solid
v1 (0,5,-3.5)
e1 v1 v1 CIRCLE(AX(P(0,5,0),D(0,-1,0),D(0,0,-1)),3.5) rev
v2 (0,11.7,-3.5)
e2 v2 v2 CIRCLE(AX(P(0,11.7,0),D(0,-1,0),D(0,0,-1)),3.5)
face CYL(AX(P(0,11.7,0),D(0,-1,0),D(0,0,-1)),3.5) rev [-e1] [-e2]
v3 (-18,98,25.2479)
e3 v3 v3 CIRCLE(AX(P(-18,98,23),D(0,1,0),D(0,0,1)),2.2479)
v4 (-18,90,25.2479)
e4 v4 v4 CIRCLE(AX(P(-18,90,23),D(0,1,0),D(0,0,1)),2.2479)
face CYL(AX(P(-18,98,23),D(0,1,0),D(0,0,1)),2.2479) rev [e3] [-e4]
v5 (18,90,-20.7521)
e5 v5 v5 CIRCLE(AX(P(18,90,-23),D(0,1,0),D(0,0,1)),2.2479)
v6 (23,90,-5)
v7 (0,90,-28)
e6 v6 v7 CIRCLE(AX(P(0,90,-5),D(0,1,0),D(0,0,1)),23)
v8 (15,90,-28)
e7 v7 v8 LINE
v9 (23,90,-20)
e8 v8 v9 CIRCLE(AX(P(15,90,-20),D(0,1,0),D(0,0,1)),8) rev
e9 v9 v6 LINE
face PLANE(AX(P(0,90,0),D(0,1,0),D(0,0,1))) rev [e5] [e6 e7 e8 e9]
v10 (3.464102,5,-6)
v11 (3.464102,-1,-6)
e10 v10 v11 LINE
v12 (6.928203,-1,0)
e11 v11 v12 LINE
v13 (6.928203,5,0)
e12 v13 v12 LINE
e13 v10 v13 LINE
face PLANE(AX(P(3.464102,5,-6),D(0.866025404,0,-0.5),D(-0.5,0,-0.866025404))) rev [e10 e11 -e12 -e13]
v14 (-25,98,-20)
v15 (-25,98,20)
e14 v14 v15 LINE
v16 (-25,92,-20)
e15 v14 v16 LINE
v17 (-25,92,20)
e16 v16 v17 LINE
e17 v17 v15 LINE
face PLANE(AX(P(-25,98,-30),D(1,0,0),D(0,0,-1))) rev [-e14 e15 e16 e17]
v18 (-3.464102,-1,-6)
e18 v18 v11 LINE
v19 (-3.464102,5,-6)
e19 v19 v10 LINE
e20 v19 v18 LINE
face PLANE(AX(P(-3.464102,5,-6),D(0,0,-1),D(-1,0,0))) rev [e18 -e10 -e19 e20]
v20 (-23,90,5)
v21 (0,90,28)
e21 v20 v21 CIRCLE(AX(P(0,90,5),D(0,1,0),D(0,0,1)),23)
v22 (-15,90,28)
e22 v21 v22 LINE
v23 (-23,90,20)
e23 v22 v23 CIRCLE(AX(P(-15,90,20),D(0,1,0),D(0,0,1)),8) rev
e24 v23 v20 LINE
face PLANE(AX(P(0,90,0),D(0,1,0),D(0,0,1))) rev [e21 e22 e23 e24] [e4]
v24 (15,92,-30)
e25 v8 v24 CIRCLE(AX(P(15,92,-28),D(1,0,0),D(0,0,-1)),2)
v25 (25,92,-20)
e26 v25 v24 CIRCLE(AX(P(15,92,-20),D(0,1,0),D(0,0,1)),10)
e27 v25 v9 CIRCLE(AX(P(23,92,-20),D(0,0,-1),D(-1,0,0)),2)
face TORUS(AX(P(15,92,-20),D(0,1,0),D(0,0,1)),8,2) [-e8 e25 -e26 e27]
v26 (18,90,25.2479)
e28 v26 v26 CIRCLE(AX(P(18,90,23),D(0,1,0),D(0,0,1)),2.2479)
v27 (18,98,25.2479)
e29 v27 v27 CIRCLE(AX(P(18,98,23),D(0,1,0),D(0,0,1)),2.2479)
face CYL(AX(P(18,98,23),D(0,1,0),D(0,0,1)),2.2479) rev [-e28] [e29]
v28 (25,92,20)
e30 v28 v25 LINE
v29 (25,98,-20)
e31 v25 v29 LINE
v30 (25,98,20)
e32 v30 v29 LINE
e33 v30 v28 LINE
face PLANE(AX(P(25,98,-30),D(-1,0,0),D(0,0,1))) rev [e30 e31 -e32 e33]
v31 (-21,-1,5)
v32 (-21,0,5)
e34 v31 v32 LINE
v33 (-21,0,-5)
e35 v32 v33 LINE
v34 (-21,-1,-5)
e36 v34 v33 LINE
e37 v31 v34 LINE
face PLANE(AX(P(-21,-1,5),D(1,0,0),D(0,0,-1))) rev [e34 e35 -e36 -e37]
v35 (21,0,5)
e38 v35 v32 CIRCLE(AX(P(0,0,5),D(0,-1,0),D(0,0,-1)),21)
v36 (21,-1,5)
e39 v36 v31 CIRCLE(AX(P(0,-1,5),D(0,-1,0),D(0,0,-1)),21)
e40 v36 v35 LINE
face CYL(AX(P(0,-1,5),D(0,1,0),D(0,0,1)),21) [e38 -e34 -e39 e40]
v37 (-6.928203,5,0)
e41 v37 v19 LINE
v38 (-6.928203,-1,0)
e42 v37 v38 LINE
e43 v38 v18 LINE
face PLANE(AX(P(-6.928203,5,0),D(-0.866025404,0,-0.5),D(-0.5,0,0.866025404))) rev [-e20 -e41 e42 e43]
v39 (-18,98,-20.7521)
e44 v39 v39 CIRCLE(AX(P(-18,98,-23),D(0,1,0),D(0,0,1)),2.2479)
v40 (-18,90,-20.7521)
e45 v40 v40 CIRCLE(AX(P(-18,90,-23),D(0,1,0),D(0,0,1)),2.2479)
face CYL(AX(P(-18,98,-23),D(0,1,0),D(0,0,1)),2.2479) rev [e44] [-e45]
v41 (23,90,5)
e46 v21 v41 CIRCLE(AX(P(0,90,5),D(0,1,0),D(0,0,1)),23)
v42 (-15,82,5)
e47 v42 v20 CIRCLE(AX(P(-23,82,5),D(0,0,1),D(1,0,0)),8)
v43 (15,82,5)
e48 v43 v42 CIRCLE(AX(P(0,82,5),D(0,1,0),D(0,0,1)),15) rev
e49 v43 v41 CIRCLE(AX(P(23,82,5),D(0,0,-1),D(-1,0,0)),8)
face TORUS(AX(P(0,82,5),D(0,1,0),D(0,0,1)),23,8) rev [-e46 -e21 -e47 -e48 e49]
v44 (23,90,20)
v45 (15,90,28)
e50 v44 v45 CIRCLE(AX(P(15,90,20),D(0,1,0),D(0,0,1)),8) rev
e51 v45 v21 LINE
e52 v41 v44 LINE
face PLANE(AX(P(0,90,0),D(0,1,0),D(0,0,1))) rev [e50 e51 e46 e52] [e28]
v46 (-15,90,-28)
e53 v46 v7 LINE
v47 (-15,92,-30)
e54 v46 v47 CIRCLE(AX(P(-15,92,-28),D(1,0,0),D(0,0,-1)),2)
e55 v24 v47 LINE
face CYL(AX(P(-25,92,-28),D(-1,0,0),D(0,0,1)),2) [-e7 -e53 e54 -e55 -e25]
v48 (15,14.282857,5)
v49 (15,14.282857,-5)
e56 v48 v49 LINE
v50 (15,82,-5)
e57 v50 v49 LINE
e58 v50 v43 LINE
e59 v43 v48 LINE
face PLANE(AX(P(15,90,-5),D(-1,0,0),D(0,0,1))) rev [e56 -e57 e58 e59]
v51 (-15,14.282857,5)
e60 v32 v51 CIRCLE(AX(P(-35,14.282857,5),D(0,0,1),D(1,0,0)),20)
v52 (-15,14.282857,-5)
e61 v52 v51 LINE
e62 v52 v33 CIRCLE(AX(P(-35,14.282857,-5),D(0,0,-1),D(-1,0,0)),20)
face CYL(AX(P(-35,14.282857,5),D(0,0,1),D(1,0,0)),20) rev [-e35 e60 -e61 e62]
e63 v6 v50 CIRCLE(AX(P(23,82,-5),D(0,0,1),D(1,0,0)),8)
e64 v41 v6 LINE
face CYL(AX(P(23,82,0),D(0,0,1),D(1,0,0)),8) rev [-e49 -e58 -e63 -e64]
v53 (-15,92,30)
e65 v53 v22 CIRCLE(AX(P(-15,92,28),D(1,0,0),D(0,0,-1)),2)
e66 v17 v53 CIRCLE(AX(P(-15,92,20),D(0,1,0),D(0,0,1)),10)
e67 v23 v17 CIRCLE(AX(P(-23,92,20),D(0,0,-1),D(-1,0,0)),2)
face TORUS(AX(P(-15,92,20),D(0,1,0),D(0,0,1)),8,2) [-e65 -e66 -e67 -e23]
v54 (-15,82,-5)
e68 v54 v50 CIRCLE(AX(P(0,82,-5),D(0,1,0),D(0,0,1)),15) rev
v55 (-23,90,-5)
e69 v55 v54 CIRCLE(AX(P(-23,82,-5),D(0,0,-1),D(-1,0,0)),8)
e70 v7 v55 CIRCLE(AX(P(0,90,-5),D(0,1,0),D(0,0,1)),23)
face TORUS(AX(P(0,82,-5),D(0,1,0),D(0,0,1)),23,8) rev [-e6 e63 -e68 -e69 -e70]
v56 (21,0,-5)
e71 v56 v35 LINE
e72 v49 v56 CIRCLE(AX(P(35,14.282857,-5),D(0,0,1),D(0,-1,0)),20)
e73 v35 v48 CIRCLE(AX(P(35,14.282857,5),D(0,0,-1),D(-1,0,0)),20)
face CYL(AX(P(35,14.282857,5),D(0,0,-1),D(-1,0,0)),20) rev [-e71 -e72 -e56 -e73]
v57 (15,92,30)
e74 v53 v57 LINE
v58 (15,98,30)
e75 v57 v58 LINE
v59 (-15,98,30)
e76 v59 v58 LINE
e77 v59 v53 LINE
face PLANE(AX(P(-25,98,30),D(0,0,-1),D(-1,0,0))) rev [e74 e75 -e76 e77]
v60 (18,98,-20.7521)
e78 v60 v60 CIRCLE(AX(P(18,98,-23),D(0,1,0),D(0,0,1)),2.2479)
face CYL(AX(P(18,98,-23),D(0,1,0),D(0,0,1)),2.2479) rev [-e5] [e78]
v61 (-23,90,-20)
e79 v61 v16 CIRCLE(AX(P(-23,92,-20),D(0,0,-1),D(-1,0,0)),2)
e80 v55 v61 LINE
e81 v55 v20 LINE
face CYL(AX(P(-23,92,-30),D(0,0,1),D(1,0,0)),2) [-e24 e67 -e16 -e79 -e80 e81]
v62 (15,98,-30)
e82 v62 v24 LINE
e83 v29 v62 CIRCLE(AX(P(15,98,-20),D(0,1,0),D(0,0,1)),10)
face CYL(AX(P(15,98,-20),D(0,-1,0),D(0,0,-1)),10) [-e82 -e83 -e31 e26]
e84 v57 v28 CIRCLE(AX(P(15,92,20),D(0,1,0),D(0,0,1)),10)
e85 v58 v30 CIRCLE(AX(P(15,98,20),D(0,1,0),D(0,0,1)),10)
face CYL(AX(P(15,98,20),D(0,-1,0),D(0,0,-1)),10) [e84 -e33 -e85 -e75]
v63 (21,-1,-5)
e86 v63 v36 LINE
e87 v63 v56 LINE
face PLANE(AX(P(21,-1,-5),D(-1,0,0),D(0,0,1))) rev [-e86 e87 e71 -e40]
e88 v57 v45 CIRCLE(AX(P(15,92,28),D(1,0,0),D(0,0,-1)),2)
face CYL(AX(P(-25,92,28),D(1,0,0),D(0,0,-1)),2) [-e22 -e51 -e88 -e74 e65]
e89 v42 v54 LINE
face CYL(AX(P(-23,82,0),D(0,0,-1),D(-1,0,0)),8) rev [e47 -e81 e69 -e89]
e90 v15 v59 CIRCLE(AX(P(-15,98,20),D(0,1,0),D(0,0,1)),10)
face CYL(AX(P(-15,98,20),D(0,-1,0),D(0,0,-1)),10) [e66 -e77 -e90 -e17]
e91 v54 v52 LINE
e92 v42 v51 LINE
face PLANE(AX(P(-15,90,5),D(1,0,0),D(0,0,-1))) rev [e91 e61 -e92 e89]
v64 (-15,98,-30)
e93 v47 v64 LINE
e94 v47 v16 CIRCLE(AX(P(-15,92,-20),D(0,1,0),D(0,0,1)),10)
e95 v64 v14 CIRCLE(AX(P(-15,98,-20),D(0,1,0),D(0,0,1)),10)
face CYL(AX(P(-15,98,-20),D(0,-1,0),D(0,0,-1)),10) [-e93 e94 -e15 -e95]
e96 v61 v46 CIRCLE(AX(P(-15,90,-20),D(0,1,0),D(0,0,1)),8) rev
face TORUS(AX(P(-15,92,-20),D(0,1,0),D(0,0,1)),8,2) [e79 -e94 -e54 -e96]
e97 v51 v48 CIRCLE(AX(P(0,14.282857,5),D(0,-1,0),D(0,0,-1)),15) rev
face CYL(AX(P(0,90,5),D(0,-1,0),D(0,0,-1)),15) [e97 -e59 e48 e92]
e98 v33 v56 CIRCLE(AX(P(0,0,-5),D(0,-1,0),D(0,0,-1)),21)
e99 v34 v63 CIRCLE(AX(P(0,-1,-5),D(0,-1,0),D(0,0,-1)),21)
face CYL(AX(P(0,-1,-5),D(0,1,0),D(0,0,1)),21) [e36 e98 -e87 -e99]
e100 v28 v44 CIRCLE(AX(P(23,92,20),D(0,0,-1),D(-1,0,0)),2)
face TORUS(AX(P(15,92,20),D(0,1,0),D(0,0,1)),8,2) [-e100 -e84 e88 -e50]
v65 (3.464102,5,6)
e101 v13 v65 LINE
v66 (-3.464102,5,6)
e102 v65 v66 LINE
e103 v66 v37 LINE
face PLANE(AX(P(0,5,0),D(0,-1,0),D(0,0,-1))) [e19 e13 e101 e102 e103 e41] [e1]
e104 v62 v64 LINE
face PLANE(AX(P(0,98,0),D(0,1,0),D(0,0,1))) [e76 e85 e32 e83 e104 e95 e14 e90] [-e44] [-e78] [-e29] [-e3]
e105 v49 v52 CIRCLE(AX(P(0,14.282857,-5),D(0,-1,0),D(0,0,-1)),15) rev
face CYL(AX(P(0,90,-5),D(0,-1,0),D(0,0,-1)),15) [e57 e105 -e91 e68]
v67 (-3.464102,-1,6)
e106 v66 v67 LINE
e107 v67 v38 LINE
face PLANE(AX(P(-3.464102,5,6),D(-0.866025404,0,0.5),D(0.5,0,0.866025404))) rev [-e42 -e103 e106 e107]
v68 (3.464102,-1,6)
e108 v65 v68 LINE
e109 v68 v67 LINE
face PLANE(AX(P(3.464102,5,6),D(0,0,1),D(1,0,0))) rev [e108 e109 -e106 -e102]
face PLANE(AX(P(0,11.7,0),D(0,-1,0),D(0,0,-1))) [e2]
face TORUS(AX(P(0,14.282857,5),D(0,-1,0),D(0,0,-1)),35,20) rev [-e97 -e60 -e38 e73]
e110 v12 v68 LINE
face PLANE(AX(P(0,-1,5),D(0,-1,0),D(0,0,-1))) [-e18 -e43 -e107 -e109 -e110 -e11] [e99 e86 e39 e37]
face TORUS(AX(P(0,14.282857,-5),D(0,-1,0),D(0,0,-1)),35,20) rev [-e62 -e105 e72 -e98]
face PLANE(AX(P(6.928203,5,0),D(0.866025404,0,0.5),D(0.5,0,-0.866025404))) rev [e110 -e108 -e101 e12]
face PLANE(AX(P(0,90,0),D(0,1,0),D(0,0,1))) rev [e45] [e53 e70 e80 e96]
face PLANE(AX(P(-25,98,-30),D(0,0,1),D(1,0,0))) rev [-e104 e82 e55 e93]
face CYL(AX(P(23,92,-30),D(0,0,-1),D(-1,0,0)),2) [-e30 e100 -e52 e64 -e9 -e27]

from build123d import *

# Parameters (mm, degrees)
BOSS_EXTRUDE1_DEPTH       = 90
BOSS_EXTRUDE2_DEPTH       = 1
SKETCH3_W                 = 50
SKETCH3_H                 = 60
BOSS_EXTRUDE3_DEPTH       = 8
FILLET1_R                 = 20
FILLET1_R_2               = 8
F_8_CLEARANCE_HOLE1_D     = 4.4958
F_8_CLEARANCE_HOLE1_DEPTH = 15
F_8_CLEARANCE_HOLE1_TIP   = 1.350674586
SKETCH8_R                 = 3.5
CUT_EXTRUDE2_DEPTH        = 12.7
CUT_EXTRUDE1_DEPTH        = 6
FILLET2_R                 = 10
FILLET3_R                 = 2


# Some blends are built 0.0001 mm under size
with BuildPart() as part:
    # Sketch1 → Boss-Extrude1 (new body)
    with BuildSketch(Plane(origin=(0, 0, 0), x_dir=(1, 0, 0), z_dir=(0, 1, 0))):
        with BuildLine():
            Line((-15, -5), (-15, 5))
            ThreePointArc((-15, 5), (0, 20), (15, 5))
            Line((15, 5), (15, -5))
            ThreePointArc((15, -5), (0, -20), (-15, -5))
        make_face()
    extrude(amount=BOSS_EXTRUDE1_DEPTH)

    # Sketch2 → Boss-Extrude2 (add)
    with BuildSketch(Plane.XZ):
        with BuildLine():
            Line((-21, 5), (-21, -5))
            ThreePointArc((-21, -5), (0, -26), (21, -5))
            Line((21, -5), (21, 5))
            ThreePointArc((21, 5), (0, 26), (-21, 5))
        make_face()
    extrude(amount=BOSS_EXTRUDE2_DEPTH)

    # Sketch3 → Boss-Extrude3 (add)
    with BuildSketch(Plane(origin=(0, 90, 0), x_dir=(1, 0, 0), z_dir=(0, 1, 0))):
        Rectangle(SKETCH3_W, SKETCH3_H)
    extrude(amount=BOSS_EXTRUDE3_DEPTH)

    # Fillet1
    # the kernel refuses this fillet: 20, 8 mm, written as the material it adds along each edge
    with BuildSketch(Plane(origin=(0, 0, 5), x_dir=(1, 0, 0), z_dir=(0, 0, -1))) as fillet1_piece_1:
        with BuildLine():
            CenterArc((35, -14.282856857), FILLET1_R, 134.427004001, 45.572995999)
            Line((21, 0), (20.72, 0.285657137))
            ThreePointArc((20.72, 0.285657137), (18, 0.4), (15, 0.4))
            Line((15, 0.4), (14.6, 0))
            Line((14.6, 0), (14.6, -14.282856857))
            Line((14.6, -14.282856857), (15, -14.282856857))
        make_face()
    revolve(axis=Axis((0, 0, 5), (0, -1, 0)), revolution_arc=180)
    with BuildSketch(Plane(origin=(0, 90, 5), x_dir=(1, 0, 0), z_dir=(0, 0, -1))) as fillet1_piece_2:
        with BuildLine():
            CenterArc((15 + FILLET1_R_2, FILLET1_R_2), FILLET1_R_2, 180, 90)
            Line((15, FILLET1_R_2), (15 - FILLET1_R_2 * 0.02, FILLET1_R_2))
            Line((15 - FILLET1_R_2 * 0.02, FILLET1_R_2), (15 - FILLET1_R_2 * 0.02, -FILLET1_R_2 * 0.02))
            Line((15 - FILLET1_R_2 * 0.02, -FILLET1_R_2 * 0.02), (15 + FILLET1_R_2, -FILLET1_R_2 * 0.02))
            Line((15 + FILLET1_R_2, -FILLET1_R_2 * 0.02), (15 + FILLET1_R_2, 0))
        make_face()
    revolve(axis=Axis((0, 90, 5), (0, -1, 0)), revolution_arc=180)
    with BuildSketch(Plane(origin=(15, 90, -5), x_dir=(1, 0, 0), z_dir=(0, 0, 1)), Plane(origin=(-15, 90, 5), x_dir=(-1, 0, 0), z_dir=(0, 0, -1))) as fillet1_piece_3:
        with BuildLine():
            CenterArc((FILLET1_R_2, -FILLET1_R_2), FILLET1_R_2, 90, 90)
            Line((0, -FILLET1_R_2), (-FILLET1_R_2 * 0.02, -FILLET1_R_2))
            Line((-FILLET1_R_2 * 0.02, -FILLET1_R_2), (-FILLET1_R_2 * 0.02, FILLET1_R_2 * 0.02))
            Line((-FILLET1_R_2 * 0.02, FILLET1_R_2 * 0.02), (FILLET1_R_2, FILLET1_R_2 * 0.02))
            Line((FILLET1_R_2, FILLET1_R_2 * 0.02), (FILLET1_R_2, 0))
        make_face()
    extrude(amount=10)
    with BuildSketch(Plane(origin=(0, 90, -5), x_dir=(-1, 0, 0), z_dir=(0, 0, 1))) as fillet1_piece_4:
        with BuildLine():
            CenterArc((15 + FILLET1_R_2, FILLET1_R_2), FILLET1_R_2, 180, 90)
            Line((15, FILLET1_R_2), (15 - FILLET1_R_2 * 0.02, FILLET1_R_2))
            Line((15 - FILLET1_R_2 * 0.02, FILLET1_R_2), (15 - FILLET1_R_2 * 0.02, -FILLET1_R_2 * 0.02))
            Line((15 - FILLET1_R_2 * 0.02, -FILLET1_R_2 * 0.02), (15 + FILLET1_R_2, -FILLET1_R_2 * 0.02))
            Line((15 + FILLET1_R_2, -FILLET1_R_2 * 0.02), (15 + FILLET1_R_2, 0))
        make_face()
    revolve(axis=Axis((0, 90, -5), (0, -1, 0)), revolution_arc=180)
    with BuildSketch(Plane(origin=(15, 0, -5), x_dir=(0, 1, 0), z_dir=(0, 0, 1)), Plane(origin=(-15, 0, 5), x_dir=(0, 1, 0), z_dir=(0, 0, -1))) as fillet1_piece_5:
        with BuildLine():
            CenterArc((14.282856857, -20), FILLET1_R, 90, 45.572995999)
            Line((0, -6), (-0.285657137, -5.72))
            ThreePointArc((-0.285657137, -5.72), (-0.4, -3), (-0.4, 0))
            Line((-0.4, 0), (0, 0.4))
            Line((0, 0.4), (14.282856857, 0.4))
            Line((14.282856857, 0.4), (14.282856857, 0))
        make_face()
    extrude(amount=10)
    with BuildSketch(Plane(origin=(0, 0, -5), x_dir=(-1, 0, 0), z_dir=(0, 0, 1))) as fillet1_piece_6:
        with BuildLine():
            CenterArc((35, -14.282856857), FILLET1_R, 134.427004001, 45.572995999)
            Line((21, 0), (20.72, 0.285657137))
            ThreePointArc((20.72, 0.285657137), (18, 0.4), (15, 0.4))
            Line((15, 0.4), (14.6, 0))
            Line((14.6, 0), (14.6, -14.282856857))
            Line((14.6, -14.282856857), (15, -14.282856857))
        make_face()
    revolve(axis=Axis((0, 0, -5), (0, -1, 0)), revolution_arc=180)

    # #8 Clearance Hole1
    with Locations(Plane(origin=(0, 98, 0), x_dir=(1, 0, 0), z_dir=(0, 1, 0))):
        with Locations((-18, 23), (18, 23), (18, -23), (-18, -23)):
            Hole(F_8_CLEARANCE_HOLE1_D / 2, depth=F_8_CLEARANCE_HOLE1_DEPTH)
            with Locations((0, 0, -(F_8_CLEARANCE_HOLE1_DEPTH + F_8_CLEARANCE_HOLE1_TIP / 2))):  # 118° drill point
                Cone(0, F_8_CLEARANCE_HOLE1_D / 2, F_8_CLEARANCE_HOLE1_TIP, mode=Mode.SUBTRACT)

    # Sketch8 → Cut-Extrude2 (cut)
    with BuildSketch(Plane.XZ.offset(1)):
        with Locations(Location((0, 0, 0), (0, 0, 270))):
            Circle(SKETCH8_R)
    extrude(amount=-CUT_EXTRUDE2_DEPTH, mode=Mode.SUBTRACT)

    # Sketch7 → Cut-Extrude1 (cut)
    with BuildSketch(Plane.XZ.offset(1)):
        Polygon((-3.464101615, -6), (3.464101615, -6), (6.92820323, 0), (3.464101615, 6), (-3.464101615, 6), (-6.92820323, 0), align=None)
    extrude(amount=-CUT_EXTRUDE1_DEPTH, mode=Mode.SUBTRACT)

    # Fillet2
    fillet2_edges = [part.edges().sort_by_distance(p)[0] for p in [
        (-25, 94, -30),
        (-25, 94, 30),
        (25, 94, 30),
        (25, 94, -30),
    ]]
    fillet(fillet2_edges, radius=FILLET2_R)

    # Fillet3
    fillet3_edges = [part.edges().sort_by_distance(p)[0] for p in [
        (0, 90, 30),
        (-25, 90, 0),
        (0, 90, -30),
        (25, 90, 0),
        (22.071067812, 90, 27.071067812),
        (22.071067812, 90, -27.071067812),
        (-22.071067812, 90, -27.071067812),
        (-22.071067812, 90, 27.071067812),
    ]]
    fillet(fillet3_edges, radius=FILLET3_R - 0.0001)  # a hair under: the kernel refuses the full size


solid = part.part
